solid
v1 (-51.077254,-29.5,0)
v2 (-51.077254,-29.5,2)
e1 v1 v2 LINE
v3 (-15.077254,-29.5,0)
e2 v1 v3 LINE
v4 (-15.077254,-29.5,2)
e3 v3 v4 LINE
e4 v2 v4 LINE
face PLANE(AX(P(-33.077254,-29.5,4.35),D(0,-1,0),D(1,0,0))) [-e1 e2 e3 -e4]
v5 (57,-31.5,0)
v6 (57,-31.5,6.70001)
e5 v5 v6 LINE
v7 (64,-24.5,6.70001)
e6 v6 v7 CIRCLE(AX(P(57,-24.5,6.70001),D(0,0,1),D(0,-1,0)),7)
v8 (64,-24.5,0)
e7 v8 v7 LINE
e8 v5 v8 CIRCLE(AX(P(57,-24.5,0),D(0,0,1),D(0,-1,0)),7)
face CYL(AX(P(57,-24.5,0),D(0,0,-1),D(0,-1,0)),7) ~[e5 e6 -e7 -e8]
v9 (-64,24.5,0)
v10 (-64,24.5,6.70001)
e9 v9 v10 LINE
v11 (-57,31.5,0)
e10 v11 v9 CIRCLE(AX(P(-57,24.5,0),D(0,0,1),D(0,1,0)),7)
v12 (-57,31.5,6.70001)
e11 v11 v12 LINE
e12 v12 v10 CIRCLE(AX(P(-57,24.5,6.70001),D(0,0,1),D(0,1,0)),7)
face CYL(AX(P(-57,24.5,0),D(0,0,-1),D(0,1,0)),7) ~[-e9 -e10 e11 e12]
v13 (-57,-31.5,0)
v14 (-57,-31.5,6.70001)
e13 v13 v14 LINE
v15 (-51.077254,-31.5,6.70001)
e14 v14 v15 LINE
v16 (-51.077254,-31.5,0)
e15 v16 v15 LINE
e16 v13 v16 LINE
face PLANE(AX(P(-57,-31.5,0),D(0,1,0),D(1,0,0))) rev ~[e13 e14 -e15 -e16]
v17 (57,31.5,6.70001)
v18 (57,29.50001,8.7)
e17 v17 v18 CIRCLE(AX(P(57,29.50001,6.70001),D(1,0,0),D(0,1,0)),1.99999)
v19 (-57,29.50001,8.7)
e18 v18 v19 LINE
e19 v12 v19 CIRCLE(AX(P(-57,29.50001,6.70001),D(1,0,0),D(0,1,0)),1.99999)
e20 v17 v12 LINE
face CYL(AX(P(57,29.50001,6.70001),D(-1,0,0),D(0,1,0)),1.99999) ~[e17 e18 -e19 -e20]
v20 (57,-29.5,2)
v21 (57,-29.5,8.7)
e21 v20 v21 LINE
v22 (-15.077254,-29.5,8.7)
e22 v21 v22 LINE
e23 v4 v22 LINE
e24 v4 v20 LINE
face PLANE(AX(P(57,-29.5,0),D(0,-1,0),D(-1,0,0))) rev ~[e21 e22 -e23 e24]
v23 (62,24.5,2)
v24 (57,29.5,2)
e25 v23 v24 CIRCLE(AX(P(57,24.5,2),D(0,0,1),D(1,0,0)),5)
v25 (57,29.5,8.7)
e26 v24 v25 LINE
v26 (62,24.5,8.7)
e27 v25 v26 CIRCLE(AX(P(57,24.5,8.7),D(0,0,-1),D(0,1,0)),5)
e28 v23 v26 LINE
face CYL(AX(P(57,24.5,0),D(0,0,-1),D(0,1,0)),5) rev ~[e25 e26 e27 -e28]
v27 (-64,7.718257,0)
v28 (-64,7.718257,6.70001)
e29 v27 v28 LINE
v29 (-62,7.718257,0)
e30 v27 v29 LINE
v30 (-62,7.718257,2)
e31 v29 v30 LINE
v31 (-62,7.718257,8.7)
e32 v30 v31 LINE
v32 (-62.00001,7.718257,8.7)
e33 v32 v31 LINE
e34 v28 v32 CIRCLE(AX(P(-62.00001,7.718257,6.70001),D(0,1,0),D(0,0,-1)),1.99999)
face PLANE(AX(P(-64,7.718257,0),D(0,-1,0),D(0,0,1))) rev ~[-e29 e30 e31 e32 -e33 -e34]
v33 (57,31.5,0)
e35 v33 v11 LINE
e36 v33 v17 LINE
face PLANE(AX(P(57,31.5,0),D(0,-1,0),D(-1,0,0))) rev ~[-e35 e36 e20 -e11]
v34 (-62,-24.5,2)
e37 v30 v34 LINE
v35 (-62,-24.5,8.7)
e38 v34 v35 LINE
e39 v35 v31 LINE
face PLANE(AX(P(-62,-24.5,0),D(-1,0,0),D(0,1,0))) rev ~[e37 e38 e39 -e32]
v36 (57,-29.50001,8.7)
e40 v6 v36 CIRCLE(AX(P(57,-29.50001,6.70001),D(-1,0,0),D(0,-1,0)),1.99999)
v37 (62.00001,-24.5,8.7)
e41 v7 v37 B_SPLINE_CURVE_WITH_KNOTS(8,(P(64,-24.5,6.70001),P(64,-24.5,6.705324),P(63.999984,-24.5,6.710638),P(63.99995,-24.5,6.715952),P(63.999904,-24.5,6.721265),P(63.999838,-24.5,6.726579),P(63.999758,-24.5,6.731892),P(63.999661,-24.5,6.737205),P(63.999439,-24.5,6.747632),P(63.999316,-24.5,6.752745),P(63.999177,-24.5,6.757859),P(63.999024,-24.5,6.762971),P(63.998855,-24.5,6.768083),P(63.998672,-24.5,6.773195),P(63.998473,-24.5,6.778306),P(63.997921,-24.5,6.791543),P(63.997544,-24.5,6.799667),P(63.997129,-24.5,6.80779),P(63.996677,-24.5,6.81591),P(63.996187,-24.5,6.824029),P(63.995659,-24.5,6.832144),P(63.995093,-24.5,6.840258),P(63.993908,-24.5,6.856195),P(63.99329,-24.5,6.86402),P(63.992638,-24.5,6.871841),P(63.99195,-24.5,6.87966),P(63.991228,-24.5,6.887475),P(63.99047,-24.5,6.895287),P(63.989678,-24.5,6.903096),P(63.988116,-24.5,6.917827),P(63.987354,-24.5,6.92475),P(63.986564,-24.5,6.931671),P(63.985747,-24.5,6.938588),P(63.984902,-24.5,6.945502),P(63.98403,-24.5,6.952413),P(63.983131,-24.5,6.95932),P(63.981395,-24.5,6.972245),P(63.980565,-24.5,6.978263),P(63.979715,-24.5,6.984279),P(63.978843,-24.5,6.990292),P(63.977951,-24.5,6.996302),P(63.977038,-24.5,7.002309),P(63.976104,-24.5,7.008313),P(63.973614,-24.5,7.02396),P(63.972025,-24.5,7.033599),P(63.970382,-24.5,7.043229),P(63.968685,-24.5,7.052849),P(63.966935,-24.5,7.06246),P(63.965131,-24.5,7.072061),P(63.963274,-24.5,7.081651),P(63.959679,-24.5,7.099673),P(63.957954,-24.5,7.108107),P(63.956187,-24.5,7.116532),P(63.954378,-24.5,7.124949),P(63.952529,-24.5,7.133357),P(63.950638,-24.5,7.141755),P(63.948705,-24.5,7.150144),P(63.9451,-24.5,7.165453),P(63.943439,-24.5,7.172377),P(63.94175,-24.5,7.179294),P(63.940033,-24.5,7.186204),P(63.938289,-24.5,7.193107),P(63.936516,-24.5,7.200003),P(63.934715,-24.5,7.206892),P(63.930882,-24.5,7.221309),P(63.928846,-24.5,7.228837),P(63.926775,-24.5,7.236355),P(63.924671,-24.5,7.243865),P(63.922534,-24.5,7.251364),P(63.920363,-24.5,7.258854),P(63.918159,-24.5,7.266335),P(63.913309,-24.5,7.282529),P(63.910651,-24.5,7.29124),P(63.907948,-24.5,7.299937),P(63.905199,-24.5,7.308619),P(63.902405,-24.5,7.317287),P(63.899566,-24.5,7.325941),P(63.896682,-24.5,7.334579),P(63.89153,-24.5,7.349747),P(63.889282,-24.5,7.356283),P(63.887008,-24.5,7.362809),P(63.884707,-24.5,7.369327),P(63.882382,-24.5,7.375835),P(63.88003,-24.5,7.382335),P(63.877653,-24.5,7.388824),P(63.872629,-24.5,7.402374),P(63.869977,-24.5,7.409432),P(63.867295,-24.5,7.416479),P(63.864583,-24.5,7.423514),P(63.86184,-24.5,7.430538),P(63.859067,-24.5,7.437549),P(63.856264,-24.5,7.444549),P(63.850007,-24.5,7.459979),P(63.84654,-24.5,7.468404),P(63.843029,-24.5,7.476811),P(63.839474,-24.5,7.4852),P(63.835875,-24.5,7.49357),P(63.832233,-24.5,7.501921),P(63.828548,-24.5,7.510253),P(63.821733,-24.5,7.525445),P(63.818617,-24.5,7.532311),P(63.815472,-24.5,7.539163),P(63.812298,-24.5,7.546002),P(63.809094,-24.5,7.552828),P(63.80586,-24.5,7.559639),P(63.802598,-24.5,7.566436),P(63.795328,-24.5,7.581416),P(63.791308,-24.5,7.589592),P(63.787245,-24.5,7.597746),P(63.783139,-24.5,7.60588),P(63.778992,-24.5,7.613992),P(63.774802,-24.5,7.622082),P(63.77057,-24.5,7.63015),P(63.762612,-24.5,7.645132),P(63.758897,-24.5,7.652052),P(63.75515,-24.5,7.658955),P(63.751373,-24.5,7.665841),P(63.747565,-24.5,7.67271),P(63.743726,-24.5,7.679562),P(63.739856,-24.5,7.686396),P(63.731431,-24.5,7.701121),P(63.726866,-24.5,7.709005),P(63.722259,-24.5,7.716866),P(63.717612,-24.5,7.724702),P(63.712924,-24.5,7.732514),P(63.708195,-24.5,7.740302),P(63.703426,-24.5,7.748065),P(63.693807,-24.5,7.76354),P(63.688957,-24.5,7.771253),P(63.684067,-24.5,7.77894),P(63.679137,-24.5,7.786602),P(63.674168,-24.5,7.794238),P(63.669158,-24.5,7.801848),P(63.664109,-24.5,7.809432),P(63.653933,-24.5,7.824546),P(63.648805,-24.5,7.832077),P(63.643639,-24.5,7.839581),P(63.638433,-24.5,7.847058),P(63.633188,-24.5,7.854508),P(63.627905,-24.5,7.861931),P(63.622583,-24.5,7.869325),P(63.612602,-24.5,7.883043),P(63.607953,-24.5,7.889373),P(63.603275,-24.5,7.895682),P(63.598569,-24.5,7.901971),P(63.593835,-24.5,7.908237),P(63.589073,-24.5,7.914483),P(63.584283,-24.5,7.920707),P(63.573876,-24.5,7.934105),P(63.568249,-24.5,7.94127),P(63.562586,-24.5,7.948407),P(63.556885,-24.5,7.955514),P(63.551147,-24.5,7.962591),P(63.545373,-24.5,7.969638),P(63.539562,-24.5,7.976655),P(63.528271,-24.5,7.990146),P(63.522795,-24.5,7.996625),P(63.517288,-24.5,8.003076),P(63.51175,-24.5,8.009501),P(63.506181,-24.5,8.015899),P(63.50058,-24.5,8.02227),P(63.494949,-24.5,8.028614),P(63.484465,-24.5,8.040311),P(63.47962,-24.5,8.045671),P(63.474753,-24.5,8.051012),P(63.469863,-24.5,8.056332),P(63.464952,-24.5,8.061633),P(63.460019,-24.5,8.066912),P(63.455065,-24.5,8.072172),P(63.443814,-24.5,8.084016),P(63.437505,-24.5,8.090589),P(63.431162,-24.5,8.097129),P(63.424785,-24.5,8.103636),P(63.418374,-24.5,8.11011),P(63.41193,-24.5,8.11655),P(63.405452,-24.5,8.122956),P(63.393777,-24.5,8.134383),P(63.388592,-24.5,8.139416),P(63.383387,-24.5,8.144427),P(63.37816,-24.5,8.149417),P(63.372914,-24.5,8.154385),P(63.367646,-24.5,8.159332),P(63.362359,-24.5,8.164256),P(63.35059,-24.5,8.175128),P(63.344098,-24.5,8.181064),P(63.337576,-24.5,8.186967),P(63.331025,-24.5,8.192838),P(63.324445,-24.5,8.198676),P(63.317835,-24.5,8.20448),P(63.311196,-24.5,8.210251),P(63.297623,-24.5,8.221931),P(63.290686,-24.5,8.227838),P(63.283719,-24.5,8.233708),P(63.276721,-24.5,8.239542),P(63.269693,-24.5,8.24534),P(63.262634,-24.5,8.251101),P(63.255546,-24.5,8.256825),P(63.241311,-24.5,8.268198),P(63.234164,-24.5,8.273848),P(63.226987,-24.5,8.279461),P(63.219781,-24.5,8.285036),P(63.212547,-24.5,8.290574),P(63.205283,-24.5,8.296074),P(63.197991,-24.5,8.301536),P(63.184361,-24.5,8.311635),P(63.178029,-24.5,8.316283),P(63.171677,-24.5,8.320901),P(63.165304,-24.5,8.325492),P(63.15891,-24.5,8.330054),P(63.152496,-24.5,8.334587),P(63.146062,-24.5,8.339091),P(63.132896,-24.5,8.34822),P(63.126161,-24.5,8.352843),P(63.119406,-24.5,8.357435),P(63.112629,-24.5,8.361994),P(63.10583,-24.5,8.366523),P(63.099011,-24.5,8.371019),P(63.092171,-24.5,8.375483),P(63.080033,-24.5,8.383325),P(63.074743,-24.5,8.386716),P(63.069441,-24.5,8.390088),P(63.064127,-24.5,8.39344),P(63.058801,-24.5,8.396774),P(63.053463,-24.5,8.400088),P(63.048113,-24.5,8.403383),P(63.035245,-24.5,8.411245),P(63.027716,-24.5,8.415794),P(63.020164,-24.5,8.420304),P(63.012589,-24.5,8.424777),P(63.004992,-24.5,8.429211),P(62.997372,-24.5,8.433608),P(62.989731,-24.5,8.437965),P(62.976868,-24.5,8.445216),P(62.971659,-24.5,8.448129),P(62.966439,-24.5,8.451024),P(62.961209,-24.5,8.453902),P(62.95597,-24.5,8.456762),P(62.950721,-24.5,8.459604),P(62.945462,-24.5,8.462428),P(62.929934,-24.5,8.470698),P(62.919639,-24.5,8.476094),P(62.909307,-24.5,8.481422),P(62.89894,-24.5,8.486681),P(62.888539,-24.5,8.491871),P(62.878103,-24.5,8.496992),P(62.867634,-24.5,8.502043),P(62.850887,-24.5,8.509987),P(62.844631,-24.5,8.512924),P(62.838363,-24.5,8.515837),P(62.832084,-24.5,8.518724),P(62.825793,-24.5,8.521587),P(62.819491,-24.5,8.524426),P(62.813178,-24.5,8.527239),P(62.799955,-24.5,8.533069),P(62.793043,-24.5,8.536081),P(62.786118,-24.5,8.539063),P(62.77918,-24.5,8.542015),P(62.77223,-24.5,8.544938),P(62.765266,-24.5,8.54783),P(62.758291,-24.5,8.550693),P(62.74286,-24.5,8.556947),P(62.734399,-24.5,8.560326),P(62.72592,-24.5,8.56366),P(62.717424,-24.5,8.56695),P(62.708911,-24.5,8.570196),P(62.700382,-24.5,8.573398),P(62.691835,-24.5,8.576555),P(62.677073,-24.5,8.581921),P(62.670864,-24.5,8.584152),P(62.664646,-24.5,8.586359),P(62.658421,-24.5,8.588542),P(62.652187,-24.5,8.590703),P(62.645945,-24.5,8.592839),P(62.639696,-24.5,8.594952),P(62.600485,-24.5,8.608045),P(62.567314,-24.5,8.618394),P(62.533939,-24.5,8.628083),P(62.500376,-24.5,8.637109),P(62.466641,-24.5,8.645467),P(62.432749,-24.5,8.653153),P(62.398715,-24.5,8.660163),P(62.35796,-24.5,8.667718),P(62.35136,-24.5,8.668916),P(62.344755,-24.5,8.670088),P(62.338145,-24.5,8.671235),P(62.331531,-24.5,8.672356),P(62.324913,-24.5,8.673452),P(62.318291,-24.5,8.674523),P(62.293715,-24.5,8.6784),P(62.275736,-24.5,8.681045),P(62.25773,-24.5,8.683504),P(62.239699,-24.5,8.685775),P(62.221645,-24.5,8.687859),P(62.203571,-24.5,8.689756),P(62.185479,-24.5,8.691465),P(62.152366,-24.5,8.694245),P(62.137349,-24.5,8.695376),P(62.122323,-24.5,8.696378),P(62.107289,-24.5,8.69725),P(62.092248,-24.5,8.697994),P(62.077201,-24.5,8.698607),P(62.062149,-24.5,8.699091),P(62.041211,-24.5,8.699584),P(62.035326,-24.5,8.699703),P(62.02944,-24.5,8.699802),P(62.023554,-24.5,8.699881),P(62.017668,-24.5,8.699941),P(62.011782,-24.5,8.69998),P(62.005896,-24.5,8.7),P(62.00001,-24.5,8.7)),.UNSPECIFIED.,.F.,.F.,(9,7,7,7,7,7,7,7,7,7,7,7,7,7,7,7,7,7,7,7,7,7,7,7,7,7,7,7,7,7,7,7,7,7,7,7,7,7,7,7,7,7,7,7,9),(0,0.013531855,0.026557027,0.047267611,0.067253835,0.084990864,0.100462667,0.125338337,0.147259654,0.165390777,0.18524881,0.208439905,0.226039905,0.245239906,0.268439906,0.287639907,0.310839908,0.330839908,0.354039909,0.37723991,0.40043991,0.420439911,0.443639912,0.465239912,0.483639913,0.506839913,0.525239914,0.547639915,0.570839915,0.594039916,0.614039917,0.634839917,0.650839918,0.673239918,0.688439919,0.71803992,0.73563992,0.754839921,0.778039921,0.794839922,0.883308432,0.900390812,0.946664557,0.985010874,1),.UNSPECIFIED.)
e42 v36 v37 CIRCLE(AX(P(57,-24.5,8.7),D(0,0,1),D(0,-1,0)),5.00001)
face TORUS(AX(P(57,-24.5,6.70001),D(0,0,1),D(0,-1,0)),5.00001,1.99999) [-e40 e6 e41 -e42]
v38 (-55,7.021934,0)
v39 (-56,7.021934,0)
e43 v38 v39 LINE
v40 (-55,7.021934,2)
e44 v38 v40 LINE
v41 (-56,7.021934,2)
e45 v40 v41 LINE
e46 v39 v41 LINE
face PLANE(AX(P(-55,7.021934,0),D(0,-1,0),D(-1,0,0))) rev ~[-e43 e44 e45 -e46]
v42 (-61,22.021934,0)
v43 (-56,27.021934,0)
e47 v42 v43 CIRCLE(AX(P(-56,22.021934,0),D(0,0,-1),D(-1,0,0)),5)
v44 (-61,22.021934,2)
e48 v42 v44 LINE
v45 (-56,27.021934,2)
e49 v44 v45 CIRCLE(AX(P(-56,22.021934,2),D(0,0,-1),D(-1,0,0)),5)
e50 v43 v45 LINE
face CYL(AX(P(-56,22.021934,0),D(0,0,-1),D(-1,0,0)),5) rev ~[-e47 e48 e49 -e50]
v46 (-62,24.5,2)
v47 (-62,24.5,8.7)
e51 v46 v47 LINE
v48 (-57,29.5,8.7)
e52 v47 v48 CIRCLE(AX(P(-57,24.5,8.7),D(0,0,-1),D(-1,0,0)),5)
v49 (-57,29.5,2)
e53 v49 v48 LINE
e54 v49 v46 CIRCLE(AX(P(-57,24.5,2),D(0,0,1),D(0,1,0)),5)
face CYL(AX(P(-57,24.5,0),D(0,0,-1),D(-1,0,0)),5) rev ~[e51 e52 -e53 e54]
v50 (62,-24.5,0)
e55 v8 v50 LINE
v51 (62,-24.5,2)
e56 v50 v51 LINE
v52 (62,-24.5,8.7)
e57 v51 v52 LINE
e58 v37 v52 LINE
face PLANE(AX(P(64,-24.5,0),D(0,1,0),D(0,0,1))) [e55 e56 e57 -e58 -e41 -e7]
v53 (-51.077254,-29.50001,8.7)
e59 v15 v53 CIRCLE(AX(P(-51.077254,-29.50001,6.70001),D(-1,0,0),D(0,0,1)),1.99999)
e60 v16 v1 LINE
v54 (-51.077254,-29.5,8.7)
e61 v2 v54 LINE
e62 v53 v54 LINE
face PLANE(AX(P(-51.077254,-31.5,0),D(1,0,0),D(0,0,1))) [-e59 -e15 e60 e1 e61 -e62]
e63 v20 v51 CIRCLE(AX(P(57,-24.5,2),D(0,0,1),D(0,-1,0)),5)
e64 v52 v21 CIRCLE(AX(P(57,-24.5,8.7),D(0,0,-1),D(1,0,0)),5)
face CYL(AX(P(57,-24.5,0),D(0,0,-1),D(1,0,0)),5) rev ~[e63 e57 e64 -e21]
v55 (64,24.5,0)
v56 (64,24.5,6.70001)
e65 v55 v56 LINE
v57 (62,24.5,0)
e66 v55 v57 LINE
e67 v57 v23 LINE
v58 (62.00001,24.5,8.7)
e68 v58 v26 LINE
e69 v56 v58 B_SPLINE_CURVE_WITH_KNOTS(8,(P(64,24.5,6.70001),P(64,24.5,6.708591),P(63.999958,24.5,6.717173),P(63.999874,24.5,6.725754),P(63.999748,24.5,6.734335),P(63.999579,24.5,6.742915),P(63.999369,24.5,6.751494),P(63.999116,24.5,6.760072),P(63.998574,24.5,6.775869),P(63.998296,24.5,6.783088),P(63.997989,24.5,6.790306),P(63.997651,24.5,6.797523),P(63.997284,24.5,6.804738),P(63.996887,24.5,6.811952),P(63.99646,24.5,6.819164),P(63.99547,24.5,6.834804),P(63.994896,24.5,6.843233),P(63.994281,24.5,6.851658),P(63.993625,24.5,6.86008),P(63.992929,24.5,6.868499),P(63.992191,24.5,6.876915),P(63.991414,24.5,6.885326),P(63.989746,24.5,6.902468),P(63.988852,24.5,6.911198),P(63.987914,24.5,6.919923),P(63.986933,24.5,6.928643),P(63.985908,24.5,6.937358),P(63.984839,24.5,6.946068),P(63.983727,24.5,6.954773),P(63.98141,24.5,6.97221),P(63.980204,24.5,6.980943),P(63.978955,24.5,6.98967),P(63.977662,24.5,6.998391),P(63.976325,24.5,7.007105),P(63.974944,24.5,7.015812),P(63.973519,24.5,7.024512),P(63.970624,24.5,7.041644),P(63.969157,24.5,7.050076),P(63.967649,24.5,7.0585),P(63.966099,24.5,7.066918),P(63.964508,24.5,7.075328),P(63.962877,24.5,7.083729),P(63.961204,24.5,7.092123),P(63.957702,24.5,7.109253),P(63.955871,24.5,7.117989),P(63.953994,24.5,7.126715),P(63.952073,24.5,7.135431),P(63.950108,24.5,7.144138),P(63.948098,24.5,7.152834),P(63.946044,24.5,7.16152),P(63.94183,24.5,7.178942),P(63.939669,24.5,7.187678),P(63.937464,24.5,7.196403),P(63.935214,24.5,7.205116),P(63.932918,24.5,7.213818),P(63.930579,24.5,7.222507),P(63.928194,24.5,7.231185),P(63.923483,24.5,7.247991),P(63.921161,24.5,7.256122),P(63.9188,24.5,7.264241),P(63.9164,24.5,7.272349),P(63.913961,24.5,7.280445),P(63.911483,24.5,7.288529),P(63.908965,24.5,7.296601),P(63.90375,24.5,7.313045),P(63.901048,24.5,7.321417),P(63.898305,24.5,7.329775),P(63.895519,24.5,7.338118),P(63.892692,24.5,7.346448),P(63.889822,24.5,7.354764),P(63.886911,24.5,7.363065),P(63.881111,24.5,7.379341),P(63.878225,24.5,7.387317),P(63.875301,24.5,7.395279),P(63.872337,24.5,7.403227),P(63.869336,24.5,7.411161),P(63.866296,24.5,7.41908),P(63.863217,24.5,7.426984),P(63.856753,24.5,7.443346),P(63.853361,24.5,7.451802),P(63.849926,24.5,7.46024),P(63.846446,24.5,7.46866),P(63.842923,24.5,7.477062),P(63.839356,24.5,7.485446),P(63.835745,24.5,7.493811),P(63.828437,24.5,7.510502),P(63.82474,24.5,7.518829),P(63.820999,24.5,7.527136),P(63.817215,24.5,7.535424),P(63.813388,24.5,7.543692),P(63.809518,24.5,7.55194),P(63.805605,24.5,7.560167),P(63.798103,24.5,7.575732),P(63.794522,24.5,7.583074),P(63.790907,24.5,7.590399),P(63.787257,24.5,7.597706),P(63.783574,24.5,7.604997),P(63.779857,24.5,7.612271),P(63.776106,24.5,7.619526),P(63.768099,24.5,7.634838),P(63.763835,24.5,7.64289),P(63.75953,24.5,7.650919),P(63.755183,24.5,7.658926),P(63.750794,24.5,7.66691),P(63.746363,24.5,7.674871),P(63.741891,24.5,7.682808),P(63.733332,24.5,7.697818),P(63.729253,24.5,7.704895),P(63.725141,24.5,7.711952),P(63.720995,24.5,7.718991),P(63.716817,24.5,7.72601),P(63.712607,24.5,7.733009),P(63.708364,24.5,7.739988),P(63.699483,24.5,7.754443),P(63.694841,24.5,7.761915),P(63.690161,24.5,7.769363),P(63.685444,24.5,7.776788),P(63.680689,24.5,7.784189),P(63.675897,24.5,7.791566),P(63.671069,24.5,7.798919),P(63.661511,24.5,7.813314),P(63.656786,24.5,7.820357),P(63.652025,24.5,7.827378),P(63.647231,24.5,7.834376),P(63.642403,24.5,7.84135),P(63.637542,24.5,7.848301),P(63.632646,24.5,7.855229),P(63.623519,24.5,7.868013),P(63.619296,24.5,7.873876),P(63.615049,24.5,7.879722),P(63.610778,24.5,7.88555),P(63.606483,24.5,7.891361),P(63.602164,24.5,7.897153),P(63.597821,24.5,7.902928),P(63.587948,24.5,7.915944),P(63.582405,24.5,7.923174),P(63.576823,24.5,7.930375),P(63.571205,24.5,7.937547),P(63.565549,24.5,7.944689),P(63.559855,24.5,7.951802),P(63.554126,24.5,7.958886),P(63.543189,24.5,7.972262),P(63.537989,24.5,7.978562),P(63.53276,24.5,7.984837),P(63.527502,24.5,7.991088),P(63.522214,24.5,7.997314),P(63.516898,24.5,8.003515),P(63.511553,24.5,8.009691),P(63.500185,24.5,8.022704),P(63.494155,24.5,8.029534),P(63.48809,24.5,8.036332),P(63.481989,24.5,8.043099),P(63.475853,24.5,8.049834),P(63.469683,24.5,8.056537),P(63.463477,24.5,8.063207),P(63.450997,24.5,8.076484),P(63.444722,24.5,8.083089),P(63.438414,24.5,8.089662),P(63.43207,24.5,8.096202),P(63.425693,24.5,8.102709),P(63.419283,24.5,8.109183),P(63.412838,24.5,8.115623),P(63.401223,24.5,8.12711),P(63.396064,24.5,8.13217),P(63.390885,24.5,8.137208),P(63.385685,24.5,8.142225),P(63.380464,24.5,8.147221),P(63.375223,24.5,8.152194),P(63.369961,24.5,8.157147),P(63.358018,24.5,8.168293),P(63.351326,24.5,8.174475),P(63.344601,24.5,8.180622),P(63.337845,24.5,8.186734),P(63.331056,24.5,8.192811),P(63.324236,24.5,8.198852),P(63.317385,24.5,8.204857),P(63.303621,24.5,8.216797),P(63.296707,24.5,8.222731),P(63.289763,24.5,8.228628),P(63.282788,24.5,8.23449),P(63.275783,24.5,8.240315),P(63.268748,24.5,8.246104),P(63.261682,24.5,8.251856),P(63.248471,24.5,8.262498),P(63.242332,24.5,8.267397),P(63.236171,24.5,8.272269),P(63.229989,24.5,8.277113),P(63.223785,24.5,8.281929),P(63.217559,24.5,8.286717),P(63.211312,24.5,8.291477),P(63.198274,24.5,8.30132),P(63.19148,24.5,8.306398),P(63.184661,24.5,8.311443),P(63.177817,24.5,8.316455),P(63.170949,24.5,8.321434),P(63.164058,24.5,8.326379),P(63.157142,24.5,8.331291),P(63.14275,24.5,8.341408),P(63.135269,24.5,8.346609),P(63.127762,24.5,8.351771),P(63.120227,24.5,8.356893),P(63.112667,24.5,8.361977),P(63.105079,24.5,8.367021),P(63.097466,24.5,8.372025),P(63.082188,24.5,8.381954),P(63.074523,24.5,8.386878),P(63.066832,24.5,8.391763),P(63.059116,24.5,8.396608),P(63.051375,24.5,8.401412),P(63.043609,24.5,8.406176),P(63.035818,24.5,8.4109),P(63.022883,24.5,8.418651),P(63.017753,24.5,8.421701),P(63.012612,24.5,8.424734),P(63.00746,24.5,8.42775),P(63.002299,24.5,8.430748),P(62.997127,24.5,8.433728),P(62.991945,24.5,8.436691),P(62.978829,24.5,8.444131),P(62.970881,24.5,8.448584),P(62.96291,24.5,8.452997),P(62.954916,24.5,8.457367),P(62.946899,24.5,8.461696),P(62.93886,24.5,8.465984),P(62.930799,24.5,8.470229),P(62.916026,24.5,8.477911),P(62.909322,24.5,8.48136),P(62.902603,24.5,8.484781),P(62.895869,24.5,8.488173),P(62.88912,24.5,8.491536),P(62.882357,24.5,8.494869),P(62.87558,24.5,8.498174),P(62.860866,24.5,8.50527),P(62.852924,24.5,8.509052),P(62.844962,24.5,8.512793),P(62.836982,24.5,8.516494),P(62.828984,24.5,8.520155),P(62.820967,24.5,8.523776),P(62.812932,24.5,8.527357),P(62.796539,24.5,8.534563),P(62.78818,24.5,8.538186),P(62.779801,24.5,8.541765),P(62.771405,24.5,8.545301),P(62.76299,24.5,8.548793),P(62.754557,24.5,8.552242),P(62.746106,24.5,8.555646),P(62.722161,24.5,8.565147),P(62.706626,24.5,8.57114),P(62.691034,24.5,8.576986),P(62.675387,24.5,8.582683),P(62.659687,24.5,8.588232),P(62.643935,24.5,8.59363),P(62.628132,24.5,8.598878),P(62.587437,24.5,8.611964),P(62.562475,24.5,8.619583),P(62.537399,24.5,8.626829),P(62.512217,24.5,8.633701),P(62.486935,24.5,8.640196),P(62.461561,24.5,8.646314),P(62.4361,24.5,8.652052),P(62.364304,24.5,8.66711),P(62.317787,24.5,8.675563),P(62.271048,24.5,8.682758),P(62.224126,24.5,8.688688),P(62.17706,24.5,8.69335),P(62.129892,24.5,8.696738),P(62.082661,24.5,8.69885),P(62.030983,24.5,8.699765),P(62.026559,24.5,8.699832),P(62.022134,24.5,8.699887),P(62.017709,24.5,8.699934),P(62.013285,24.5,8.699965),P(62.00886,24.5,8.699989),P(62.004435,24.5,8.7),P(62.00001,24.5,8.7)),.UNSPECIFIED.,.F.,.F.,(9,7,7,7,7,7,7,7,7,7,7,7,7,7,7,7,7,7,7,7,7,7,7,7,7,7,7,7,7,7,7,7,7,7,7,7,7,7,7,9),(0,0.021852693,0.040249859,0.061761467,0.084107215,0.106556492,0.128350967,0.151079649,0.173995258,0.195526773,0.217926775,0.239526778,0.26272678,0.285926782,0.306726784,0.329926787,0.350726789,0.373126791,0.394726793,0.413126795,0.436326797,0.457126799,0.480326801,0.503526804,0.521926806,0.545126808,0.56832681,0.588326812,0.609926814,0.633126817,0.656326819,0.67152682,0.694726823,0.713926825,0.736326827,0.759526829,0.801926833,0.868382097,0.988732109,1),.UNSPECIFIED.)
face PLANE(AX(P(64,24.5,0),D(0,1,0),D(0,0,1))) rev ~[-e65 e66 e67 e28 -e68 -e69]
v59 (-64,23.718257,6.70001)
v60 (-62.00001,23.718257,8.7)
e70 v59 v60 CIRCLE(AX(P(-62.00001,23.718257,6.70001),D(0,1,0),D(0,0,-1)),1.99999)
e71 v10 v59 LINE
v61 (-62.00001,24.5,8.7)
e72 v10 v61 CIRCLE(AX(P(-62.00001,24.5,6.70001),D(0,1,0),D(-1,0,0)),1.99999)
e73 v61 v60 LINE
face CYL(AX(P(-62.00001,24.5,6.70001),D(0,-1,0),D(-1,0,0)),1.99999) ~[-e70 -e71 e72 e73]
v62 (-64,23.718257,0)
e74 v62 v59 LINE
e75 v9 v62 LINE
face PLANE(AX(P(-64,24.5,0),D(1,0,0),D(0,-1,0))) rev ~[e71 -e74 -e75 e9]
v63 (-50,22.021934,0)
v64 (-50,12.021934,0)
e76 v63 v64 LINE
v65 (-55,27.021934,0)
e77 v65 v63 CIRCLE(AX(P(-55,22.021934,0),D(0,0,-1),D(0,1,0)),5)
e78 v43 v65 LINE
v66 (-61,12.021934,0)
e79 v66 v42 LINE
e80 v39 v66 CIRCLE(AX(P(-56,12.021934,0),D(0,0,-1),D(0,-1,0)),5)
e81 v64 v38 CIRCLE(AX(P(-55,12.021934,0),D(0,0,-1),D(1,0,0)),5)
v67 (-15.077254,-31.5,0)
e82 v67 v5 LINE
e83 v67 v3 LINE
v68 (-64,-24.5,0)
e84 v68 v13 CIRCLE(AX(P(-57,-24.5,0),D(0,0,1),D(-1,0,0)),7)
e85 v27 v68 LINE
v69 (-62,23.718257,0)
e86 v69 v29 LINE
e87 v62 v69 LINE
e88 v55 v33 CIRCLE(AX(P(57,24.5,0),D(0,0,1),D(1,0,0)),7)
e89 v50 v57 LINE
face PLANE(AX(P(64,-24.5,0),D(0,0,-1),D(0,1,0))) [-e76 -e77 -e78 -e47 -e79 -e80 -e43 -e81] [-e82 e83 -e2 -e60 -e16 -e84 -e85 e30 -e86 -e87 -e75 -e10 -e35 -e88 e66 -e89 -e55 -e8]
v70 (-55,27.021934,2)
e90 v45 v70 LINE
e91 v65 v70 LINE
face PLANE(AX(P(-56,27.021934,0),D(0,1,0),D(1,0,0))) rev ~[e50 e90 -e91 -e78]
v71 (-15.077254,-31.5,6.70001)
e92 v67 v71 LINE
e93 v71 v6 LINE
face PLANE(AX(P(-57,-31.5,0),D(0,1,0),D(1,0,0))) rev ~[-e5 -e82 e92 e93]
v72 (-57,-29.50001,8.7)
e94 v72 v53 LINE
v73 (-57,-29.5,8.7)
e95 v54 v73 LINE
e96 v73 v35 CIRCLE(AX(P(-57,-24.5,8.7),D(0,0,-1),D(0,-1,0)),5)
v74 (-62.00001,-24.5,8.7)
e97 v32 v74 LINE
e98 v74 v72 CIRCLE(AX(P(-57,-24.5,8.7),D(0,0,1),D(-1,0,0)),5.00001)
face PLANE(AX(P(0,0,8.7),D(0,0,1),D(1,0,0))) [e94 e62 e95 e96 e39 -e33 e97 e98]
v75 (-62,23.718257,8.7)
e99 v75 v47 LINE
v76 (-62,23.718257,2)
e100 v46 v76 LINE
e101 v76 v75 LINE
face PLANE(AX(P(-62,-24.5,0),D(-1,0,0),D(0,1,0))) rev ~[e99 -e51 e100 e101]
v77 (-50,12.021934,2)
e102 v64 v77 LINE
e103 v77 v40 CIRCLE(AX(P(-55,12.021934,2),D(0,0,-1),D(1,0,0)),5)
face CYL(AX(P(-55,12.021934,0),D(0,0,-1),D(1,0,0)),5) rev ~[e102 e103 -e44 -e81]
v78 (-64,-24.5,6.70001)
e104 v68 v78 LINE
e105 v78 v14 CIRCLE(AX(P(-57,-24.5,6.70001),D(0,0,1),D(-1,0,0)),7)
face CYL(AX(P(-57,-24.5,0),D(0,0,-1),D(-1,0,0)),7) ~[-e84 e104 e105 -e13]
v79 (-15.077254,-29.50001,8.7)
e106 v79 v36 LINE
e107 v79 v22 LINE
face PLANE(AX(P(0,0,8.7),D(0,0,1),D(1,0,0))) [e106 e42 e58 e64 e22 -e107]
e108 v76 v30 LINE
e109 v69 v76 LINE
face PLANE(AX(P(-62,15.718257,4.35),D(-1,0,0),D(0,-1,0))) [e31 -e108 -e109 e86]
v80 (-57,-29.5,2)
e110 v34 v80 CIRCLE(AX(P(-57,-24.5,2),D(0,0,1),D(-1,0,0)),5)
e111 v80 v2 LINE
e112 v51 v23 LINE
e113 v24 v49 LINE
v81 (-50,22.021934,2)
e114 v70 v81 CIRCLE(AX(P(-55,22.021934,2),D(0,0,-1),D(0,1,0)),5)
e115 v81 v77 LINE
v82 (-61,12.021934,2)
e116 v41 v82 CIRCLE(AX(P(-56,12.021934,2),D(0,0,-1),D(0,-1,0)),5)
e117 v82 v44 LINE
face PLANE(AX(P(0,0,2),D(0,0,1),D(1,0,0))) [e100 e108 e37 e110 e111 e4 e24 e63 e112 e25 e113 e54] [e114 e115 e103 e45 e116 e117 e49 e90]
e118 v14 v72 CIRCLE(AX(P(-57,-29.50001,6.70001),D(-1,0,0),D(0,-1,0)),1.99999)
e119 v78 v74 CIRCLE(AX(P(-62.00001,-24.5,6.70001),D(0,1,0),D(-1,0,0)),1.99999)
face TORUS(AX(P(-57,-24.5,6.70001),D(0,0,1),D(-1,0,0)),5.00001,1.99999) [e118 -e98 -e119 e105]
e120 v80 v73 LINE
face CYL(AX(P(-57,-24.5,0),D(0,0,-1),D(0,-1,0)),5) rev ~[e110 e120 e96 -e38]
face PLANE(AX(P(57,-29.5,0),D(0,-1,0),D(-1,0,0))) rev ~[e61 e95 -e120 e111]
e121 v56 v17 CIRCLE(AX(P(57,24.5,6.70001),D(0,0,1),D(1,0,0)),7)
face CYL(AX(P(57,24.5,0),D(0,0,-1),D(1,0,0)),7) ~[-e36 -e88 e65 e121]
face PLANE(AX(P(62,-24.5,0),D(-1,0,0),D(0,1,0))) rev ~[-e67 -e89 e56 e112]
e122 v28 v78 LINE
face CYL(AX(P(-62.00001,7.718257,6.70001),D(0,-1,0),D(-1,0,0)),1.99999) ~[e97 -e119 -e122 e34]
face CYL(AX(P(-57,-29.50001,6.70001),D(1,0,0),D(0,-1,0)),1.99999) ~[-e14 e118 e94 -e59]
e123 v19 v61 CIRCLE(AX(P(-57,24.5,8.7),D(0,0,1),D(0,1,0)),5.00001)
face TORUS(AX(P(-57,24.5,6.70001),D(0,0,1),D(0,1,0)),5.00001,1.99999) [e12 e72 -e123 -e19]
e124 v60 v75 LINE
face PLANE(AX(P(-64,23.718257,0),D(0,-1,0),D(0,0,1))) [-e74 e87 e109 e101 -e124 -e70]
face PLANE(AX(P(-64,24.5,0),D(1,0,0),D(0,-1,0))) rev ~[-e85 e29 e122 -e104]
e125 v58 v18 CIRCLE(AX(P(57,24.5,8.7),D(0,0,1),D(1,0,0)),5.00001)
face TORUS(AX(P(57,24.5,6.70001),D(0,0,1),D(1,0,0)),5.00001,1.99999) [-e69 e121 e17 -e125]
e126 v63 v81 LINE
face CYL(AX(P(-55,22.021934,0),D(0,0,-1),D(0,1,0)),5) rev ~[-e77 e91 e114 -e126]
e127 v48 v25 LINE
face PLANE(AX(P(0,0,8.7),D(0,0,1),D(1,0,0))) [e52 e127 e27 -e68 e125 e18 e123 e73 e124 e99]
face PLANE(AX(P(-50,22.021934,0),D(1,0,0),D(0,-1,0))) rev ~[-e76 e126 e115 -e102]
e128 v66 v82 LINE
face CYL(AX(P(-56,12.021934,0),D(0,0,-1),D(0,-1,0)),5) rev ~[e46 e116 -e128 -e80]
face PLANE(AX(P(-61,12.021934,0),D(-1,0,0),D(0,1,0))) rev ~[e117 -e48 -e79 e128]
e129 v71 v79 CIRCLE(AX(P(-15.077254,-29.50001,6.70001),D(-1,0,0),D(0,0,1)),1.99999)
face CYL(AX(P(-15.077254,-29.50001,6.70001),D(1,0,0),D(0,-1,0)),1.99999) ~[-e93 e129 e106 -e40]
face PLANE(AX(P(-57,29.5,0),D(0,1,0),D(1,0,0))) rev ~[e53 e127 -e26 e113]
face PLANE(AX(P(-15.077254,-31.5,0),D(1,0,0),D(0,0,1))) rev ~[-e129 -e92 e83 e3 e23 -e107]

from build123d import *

# Parameters (mm, degrees)
F1_DEPTH = 2
F2_DEPTH = 8.7
F3_W     = 36
F3_H     = 8.7
F4_DEPTH = 2
F5_DEPTH = 2
F6_DEPTH = 2
F7_DEPTH = 2
F8_W     = 16
F8_H     = 8.7
F9_DEPTH = 2
F10_R    = 1.99999
F11_R    = 1.99999


# Not quite as in the source:
# - a fillet or chamfer is up to 0.001 mm smaller than in the source, because OpenCascade refuses the exact size


with BuildPart() as f1:
    # F0 (on Top) → F1 (new body)
    with BuildSketch(Plane.XY):
        with BuildLine():
            Line((57, 29.5), (-57, 29.5))
            ThreePointArc((-57, 29.5), (-60.5355339059, 28.0355339059), (-62, 24.5))
            Line((-62, 24.5), (-62, -24.5))
            ThreePointArc((-62, -24.5), (-60.5355339059, -28.0355339059), (-57, -29.5))
            Line((-57, -29.5), (57, -29.5))
            ThreePointArc((57, -29.5), (60.5355339059, -28.0355339059), (62, -24.5))
            Line((62, -24.5), (62, 24.5))
            ThreePointArc((62, 24.5), (60.5355339059, 28.0355339059), (57, 29.5))
        make_face()
        with BuildLine():
            Line((-56, 27.021933794), (-55, 27.021933794))
            ThreePointArc((-55, 27.021933794), (-51.4644660941, 25.5574677), (-50, 22.021933794))
            Line((-50, 22.021933794), (-50, 12.021933794))
            ThreePointArc((-50, 12.021933794), (-51.4644660941, 8.4863998881), (-55, 7.021933794))
            Line((-55, 7.021933794), (-56, 7.021933794))
            ThreePointArc((-56, 7.021933794), (-59.5355339059, 8.4863998881), (-61, 12.021933794))
            Line((-61, 12.021933794), (-61, 22.021933794))
            ThreePointArc((-61, 22.021933794), (-59.5355339059, 25.5574677), (-56, 27.021933794))
        make_face(mode=Mode.SUBTRACT)
    extrude(amount=F1_DEPTH)

    # F0 (on Top) → F2 (join)
    with BuildSketch(Plane.XY):
        with BuildLine():
            Line((57, 31.5), (-57, 31.5))
            ThreePointArc((-57, 31.5), (-61.9497474683, 29.4497474683), (-64, 24.5))
            Line((-64, 24.5), (-64, -24.5))
            ThreePointArc((-64, -24.5), (-61.9497474683, -29.4497474683), (-57, -31.5))
            Line((-57, -31.5), (57, -31.5))
            ThreePointArc((57, -31.5), (61.9497474683, -29.4497474683), (64, -24.5))
            Line((64, -24.5), (64, 24.5))
            ThreePointArc((64, 24.5), (61.9497474683, 29.4497474683), (57, 31.5))
        make_face()
        with BuildLine():
            ThreePointArc((-62, 24.5), (-60.5355339059, 28.0355339059), (-57, 29.5))
            Line((-57, 29.5), (57, 29.5))
            ThreePointArc((57, 29.5), (60.5355339059, 28.0355339059), (62, 24.5))
            Line((62, 24.5), (62, -24.5))
            ThreePointArc((62, -24.5), (60.5355339059, -28.0355339059), (57, -29.5))
            Line((57, -29.5), (-57, -29.5))
            ThreePointArc((-57, -29.5), (-60.5355339059, -28.0355339059), (-62, -24.5))
            Line((-62, -24.5), (-62, 24.5))
        make_face(mode=Mode.SUBTRACT)
    extrude(amount=F2_DEPTH)

    # F3 (on face) → F4 (cut)
    with BuildSketch(Plane.XZ.offset(31.5)):
        with Locations((-33.0772541165, 4.35)):
            Rectangle(F3_W, F3_H)
    extrude(amount=-F4_DEPTH, mode=Mode.SUBTRACT)

    # F5 (add): a face of the model
    f5_faces = [f1.faces().sort_by_distance(p)[0] for p in [
        (64, 0, 4.35),
    ]]
    extrude(f5_faces, amount=-F5_DEPTH)

    # F6 (add): a face of the model
    f6_faces = [f1.faces().sort_by_distance(p)[0] for p in [
        (64, 0, 4.35),
    ]]
    extrude(f6_faces, amount=-F6_DEPTH)

    # F7 (cut): a face of the model
    f7_faces = [f1.faces().sort_by_distance(p)[0] for p in [
        (64, 0, 4.35),
    ]]
    extrude(f7_faces, amount=-F7_DEPTH, mode=Mode.SUBTRACT)

    # F8 (on face) → F9 (cut)
    with BuildSketch(Plane(origin=(-64, 0, 0), x_dir=(0, -1, 0), z_dir=(-1, 0, 0))):
        with Locations((-15.7182565033, 4.35)):
            Rectangle(F8_W, F8_H)
    extrude(amount=-F9_DEPTH, mode=Mode.SUBTRACT)

    # F10 (radius 2 in the source; OpenCascade refuses exactly that, so slightly less here)
    f10_edges = [f1.edges().sort_by_distance(p)[0] for p in [
        (61.949747, 29.449747, 8.7),
        (0, 31.5, 8.7),
        (-61.949747, 29.449747, 8.7),
    ]]
    fillet(f10_edges, radius=F10_R)

    # F11 (radius 2 in the source; OpenCascade refuses exactly that, so slightly less here)
    f11_edges = [f1.edges().sort_by_distance(p)[0] for p in [
        (-64, -8.390872, 8.7),
        (-54.038627, -31.5, 8.7),
        (-61.949747, -29.449747, 8.7),
        (20.961373, -31.5, 8.7),
        (61.949747, -29.449747, 8.7),
    ]]
    fillet(f11_edges, radius=F11_R)


solid = f1.part
